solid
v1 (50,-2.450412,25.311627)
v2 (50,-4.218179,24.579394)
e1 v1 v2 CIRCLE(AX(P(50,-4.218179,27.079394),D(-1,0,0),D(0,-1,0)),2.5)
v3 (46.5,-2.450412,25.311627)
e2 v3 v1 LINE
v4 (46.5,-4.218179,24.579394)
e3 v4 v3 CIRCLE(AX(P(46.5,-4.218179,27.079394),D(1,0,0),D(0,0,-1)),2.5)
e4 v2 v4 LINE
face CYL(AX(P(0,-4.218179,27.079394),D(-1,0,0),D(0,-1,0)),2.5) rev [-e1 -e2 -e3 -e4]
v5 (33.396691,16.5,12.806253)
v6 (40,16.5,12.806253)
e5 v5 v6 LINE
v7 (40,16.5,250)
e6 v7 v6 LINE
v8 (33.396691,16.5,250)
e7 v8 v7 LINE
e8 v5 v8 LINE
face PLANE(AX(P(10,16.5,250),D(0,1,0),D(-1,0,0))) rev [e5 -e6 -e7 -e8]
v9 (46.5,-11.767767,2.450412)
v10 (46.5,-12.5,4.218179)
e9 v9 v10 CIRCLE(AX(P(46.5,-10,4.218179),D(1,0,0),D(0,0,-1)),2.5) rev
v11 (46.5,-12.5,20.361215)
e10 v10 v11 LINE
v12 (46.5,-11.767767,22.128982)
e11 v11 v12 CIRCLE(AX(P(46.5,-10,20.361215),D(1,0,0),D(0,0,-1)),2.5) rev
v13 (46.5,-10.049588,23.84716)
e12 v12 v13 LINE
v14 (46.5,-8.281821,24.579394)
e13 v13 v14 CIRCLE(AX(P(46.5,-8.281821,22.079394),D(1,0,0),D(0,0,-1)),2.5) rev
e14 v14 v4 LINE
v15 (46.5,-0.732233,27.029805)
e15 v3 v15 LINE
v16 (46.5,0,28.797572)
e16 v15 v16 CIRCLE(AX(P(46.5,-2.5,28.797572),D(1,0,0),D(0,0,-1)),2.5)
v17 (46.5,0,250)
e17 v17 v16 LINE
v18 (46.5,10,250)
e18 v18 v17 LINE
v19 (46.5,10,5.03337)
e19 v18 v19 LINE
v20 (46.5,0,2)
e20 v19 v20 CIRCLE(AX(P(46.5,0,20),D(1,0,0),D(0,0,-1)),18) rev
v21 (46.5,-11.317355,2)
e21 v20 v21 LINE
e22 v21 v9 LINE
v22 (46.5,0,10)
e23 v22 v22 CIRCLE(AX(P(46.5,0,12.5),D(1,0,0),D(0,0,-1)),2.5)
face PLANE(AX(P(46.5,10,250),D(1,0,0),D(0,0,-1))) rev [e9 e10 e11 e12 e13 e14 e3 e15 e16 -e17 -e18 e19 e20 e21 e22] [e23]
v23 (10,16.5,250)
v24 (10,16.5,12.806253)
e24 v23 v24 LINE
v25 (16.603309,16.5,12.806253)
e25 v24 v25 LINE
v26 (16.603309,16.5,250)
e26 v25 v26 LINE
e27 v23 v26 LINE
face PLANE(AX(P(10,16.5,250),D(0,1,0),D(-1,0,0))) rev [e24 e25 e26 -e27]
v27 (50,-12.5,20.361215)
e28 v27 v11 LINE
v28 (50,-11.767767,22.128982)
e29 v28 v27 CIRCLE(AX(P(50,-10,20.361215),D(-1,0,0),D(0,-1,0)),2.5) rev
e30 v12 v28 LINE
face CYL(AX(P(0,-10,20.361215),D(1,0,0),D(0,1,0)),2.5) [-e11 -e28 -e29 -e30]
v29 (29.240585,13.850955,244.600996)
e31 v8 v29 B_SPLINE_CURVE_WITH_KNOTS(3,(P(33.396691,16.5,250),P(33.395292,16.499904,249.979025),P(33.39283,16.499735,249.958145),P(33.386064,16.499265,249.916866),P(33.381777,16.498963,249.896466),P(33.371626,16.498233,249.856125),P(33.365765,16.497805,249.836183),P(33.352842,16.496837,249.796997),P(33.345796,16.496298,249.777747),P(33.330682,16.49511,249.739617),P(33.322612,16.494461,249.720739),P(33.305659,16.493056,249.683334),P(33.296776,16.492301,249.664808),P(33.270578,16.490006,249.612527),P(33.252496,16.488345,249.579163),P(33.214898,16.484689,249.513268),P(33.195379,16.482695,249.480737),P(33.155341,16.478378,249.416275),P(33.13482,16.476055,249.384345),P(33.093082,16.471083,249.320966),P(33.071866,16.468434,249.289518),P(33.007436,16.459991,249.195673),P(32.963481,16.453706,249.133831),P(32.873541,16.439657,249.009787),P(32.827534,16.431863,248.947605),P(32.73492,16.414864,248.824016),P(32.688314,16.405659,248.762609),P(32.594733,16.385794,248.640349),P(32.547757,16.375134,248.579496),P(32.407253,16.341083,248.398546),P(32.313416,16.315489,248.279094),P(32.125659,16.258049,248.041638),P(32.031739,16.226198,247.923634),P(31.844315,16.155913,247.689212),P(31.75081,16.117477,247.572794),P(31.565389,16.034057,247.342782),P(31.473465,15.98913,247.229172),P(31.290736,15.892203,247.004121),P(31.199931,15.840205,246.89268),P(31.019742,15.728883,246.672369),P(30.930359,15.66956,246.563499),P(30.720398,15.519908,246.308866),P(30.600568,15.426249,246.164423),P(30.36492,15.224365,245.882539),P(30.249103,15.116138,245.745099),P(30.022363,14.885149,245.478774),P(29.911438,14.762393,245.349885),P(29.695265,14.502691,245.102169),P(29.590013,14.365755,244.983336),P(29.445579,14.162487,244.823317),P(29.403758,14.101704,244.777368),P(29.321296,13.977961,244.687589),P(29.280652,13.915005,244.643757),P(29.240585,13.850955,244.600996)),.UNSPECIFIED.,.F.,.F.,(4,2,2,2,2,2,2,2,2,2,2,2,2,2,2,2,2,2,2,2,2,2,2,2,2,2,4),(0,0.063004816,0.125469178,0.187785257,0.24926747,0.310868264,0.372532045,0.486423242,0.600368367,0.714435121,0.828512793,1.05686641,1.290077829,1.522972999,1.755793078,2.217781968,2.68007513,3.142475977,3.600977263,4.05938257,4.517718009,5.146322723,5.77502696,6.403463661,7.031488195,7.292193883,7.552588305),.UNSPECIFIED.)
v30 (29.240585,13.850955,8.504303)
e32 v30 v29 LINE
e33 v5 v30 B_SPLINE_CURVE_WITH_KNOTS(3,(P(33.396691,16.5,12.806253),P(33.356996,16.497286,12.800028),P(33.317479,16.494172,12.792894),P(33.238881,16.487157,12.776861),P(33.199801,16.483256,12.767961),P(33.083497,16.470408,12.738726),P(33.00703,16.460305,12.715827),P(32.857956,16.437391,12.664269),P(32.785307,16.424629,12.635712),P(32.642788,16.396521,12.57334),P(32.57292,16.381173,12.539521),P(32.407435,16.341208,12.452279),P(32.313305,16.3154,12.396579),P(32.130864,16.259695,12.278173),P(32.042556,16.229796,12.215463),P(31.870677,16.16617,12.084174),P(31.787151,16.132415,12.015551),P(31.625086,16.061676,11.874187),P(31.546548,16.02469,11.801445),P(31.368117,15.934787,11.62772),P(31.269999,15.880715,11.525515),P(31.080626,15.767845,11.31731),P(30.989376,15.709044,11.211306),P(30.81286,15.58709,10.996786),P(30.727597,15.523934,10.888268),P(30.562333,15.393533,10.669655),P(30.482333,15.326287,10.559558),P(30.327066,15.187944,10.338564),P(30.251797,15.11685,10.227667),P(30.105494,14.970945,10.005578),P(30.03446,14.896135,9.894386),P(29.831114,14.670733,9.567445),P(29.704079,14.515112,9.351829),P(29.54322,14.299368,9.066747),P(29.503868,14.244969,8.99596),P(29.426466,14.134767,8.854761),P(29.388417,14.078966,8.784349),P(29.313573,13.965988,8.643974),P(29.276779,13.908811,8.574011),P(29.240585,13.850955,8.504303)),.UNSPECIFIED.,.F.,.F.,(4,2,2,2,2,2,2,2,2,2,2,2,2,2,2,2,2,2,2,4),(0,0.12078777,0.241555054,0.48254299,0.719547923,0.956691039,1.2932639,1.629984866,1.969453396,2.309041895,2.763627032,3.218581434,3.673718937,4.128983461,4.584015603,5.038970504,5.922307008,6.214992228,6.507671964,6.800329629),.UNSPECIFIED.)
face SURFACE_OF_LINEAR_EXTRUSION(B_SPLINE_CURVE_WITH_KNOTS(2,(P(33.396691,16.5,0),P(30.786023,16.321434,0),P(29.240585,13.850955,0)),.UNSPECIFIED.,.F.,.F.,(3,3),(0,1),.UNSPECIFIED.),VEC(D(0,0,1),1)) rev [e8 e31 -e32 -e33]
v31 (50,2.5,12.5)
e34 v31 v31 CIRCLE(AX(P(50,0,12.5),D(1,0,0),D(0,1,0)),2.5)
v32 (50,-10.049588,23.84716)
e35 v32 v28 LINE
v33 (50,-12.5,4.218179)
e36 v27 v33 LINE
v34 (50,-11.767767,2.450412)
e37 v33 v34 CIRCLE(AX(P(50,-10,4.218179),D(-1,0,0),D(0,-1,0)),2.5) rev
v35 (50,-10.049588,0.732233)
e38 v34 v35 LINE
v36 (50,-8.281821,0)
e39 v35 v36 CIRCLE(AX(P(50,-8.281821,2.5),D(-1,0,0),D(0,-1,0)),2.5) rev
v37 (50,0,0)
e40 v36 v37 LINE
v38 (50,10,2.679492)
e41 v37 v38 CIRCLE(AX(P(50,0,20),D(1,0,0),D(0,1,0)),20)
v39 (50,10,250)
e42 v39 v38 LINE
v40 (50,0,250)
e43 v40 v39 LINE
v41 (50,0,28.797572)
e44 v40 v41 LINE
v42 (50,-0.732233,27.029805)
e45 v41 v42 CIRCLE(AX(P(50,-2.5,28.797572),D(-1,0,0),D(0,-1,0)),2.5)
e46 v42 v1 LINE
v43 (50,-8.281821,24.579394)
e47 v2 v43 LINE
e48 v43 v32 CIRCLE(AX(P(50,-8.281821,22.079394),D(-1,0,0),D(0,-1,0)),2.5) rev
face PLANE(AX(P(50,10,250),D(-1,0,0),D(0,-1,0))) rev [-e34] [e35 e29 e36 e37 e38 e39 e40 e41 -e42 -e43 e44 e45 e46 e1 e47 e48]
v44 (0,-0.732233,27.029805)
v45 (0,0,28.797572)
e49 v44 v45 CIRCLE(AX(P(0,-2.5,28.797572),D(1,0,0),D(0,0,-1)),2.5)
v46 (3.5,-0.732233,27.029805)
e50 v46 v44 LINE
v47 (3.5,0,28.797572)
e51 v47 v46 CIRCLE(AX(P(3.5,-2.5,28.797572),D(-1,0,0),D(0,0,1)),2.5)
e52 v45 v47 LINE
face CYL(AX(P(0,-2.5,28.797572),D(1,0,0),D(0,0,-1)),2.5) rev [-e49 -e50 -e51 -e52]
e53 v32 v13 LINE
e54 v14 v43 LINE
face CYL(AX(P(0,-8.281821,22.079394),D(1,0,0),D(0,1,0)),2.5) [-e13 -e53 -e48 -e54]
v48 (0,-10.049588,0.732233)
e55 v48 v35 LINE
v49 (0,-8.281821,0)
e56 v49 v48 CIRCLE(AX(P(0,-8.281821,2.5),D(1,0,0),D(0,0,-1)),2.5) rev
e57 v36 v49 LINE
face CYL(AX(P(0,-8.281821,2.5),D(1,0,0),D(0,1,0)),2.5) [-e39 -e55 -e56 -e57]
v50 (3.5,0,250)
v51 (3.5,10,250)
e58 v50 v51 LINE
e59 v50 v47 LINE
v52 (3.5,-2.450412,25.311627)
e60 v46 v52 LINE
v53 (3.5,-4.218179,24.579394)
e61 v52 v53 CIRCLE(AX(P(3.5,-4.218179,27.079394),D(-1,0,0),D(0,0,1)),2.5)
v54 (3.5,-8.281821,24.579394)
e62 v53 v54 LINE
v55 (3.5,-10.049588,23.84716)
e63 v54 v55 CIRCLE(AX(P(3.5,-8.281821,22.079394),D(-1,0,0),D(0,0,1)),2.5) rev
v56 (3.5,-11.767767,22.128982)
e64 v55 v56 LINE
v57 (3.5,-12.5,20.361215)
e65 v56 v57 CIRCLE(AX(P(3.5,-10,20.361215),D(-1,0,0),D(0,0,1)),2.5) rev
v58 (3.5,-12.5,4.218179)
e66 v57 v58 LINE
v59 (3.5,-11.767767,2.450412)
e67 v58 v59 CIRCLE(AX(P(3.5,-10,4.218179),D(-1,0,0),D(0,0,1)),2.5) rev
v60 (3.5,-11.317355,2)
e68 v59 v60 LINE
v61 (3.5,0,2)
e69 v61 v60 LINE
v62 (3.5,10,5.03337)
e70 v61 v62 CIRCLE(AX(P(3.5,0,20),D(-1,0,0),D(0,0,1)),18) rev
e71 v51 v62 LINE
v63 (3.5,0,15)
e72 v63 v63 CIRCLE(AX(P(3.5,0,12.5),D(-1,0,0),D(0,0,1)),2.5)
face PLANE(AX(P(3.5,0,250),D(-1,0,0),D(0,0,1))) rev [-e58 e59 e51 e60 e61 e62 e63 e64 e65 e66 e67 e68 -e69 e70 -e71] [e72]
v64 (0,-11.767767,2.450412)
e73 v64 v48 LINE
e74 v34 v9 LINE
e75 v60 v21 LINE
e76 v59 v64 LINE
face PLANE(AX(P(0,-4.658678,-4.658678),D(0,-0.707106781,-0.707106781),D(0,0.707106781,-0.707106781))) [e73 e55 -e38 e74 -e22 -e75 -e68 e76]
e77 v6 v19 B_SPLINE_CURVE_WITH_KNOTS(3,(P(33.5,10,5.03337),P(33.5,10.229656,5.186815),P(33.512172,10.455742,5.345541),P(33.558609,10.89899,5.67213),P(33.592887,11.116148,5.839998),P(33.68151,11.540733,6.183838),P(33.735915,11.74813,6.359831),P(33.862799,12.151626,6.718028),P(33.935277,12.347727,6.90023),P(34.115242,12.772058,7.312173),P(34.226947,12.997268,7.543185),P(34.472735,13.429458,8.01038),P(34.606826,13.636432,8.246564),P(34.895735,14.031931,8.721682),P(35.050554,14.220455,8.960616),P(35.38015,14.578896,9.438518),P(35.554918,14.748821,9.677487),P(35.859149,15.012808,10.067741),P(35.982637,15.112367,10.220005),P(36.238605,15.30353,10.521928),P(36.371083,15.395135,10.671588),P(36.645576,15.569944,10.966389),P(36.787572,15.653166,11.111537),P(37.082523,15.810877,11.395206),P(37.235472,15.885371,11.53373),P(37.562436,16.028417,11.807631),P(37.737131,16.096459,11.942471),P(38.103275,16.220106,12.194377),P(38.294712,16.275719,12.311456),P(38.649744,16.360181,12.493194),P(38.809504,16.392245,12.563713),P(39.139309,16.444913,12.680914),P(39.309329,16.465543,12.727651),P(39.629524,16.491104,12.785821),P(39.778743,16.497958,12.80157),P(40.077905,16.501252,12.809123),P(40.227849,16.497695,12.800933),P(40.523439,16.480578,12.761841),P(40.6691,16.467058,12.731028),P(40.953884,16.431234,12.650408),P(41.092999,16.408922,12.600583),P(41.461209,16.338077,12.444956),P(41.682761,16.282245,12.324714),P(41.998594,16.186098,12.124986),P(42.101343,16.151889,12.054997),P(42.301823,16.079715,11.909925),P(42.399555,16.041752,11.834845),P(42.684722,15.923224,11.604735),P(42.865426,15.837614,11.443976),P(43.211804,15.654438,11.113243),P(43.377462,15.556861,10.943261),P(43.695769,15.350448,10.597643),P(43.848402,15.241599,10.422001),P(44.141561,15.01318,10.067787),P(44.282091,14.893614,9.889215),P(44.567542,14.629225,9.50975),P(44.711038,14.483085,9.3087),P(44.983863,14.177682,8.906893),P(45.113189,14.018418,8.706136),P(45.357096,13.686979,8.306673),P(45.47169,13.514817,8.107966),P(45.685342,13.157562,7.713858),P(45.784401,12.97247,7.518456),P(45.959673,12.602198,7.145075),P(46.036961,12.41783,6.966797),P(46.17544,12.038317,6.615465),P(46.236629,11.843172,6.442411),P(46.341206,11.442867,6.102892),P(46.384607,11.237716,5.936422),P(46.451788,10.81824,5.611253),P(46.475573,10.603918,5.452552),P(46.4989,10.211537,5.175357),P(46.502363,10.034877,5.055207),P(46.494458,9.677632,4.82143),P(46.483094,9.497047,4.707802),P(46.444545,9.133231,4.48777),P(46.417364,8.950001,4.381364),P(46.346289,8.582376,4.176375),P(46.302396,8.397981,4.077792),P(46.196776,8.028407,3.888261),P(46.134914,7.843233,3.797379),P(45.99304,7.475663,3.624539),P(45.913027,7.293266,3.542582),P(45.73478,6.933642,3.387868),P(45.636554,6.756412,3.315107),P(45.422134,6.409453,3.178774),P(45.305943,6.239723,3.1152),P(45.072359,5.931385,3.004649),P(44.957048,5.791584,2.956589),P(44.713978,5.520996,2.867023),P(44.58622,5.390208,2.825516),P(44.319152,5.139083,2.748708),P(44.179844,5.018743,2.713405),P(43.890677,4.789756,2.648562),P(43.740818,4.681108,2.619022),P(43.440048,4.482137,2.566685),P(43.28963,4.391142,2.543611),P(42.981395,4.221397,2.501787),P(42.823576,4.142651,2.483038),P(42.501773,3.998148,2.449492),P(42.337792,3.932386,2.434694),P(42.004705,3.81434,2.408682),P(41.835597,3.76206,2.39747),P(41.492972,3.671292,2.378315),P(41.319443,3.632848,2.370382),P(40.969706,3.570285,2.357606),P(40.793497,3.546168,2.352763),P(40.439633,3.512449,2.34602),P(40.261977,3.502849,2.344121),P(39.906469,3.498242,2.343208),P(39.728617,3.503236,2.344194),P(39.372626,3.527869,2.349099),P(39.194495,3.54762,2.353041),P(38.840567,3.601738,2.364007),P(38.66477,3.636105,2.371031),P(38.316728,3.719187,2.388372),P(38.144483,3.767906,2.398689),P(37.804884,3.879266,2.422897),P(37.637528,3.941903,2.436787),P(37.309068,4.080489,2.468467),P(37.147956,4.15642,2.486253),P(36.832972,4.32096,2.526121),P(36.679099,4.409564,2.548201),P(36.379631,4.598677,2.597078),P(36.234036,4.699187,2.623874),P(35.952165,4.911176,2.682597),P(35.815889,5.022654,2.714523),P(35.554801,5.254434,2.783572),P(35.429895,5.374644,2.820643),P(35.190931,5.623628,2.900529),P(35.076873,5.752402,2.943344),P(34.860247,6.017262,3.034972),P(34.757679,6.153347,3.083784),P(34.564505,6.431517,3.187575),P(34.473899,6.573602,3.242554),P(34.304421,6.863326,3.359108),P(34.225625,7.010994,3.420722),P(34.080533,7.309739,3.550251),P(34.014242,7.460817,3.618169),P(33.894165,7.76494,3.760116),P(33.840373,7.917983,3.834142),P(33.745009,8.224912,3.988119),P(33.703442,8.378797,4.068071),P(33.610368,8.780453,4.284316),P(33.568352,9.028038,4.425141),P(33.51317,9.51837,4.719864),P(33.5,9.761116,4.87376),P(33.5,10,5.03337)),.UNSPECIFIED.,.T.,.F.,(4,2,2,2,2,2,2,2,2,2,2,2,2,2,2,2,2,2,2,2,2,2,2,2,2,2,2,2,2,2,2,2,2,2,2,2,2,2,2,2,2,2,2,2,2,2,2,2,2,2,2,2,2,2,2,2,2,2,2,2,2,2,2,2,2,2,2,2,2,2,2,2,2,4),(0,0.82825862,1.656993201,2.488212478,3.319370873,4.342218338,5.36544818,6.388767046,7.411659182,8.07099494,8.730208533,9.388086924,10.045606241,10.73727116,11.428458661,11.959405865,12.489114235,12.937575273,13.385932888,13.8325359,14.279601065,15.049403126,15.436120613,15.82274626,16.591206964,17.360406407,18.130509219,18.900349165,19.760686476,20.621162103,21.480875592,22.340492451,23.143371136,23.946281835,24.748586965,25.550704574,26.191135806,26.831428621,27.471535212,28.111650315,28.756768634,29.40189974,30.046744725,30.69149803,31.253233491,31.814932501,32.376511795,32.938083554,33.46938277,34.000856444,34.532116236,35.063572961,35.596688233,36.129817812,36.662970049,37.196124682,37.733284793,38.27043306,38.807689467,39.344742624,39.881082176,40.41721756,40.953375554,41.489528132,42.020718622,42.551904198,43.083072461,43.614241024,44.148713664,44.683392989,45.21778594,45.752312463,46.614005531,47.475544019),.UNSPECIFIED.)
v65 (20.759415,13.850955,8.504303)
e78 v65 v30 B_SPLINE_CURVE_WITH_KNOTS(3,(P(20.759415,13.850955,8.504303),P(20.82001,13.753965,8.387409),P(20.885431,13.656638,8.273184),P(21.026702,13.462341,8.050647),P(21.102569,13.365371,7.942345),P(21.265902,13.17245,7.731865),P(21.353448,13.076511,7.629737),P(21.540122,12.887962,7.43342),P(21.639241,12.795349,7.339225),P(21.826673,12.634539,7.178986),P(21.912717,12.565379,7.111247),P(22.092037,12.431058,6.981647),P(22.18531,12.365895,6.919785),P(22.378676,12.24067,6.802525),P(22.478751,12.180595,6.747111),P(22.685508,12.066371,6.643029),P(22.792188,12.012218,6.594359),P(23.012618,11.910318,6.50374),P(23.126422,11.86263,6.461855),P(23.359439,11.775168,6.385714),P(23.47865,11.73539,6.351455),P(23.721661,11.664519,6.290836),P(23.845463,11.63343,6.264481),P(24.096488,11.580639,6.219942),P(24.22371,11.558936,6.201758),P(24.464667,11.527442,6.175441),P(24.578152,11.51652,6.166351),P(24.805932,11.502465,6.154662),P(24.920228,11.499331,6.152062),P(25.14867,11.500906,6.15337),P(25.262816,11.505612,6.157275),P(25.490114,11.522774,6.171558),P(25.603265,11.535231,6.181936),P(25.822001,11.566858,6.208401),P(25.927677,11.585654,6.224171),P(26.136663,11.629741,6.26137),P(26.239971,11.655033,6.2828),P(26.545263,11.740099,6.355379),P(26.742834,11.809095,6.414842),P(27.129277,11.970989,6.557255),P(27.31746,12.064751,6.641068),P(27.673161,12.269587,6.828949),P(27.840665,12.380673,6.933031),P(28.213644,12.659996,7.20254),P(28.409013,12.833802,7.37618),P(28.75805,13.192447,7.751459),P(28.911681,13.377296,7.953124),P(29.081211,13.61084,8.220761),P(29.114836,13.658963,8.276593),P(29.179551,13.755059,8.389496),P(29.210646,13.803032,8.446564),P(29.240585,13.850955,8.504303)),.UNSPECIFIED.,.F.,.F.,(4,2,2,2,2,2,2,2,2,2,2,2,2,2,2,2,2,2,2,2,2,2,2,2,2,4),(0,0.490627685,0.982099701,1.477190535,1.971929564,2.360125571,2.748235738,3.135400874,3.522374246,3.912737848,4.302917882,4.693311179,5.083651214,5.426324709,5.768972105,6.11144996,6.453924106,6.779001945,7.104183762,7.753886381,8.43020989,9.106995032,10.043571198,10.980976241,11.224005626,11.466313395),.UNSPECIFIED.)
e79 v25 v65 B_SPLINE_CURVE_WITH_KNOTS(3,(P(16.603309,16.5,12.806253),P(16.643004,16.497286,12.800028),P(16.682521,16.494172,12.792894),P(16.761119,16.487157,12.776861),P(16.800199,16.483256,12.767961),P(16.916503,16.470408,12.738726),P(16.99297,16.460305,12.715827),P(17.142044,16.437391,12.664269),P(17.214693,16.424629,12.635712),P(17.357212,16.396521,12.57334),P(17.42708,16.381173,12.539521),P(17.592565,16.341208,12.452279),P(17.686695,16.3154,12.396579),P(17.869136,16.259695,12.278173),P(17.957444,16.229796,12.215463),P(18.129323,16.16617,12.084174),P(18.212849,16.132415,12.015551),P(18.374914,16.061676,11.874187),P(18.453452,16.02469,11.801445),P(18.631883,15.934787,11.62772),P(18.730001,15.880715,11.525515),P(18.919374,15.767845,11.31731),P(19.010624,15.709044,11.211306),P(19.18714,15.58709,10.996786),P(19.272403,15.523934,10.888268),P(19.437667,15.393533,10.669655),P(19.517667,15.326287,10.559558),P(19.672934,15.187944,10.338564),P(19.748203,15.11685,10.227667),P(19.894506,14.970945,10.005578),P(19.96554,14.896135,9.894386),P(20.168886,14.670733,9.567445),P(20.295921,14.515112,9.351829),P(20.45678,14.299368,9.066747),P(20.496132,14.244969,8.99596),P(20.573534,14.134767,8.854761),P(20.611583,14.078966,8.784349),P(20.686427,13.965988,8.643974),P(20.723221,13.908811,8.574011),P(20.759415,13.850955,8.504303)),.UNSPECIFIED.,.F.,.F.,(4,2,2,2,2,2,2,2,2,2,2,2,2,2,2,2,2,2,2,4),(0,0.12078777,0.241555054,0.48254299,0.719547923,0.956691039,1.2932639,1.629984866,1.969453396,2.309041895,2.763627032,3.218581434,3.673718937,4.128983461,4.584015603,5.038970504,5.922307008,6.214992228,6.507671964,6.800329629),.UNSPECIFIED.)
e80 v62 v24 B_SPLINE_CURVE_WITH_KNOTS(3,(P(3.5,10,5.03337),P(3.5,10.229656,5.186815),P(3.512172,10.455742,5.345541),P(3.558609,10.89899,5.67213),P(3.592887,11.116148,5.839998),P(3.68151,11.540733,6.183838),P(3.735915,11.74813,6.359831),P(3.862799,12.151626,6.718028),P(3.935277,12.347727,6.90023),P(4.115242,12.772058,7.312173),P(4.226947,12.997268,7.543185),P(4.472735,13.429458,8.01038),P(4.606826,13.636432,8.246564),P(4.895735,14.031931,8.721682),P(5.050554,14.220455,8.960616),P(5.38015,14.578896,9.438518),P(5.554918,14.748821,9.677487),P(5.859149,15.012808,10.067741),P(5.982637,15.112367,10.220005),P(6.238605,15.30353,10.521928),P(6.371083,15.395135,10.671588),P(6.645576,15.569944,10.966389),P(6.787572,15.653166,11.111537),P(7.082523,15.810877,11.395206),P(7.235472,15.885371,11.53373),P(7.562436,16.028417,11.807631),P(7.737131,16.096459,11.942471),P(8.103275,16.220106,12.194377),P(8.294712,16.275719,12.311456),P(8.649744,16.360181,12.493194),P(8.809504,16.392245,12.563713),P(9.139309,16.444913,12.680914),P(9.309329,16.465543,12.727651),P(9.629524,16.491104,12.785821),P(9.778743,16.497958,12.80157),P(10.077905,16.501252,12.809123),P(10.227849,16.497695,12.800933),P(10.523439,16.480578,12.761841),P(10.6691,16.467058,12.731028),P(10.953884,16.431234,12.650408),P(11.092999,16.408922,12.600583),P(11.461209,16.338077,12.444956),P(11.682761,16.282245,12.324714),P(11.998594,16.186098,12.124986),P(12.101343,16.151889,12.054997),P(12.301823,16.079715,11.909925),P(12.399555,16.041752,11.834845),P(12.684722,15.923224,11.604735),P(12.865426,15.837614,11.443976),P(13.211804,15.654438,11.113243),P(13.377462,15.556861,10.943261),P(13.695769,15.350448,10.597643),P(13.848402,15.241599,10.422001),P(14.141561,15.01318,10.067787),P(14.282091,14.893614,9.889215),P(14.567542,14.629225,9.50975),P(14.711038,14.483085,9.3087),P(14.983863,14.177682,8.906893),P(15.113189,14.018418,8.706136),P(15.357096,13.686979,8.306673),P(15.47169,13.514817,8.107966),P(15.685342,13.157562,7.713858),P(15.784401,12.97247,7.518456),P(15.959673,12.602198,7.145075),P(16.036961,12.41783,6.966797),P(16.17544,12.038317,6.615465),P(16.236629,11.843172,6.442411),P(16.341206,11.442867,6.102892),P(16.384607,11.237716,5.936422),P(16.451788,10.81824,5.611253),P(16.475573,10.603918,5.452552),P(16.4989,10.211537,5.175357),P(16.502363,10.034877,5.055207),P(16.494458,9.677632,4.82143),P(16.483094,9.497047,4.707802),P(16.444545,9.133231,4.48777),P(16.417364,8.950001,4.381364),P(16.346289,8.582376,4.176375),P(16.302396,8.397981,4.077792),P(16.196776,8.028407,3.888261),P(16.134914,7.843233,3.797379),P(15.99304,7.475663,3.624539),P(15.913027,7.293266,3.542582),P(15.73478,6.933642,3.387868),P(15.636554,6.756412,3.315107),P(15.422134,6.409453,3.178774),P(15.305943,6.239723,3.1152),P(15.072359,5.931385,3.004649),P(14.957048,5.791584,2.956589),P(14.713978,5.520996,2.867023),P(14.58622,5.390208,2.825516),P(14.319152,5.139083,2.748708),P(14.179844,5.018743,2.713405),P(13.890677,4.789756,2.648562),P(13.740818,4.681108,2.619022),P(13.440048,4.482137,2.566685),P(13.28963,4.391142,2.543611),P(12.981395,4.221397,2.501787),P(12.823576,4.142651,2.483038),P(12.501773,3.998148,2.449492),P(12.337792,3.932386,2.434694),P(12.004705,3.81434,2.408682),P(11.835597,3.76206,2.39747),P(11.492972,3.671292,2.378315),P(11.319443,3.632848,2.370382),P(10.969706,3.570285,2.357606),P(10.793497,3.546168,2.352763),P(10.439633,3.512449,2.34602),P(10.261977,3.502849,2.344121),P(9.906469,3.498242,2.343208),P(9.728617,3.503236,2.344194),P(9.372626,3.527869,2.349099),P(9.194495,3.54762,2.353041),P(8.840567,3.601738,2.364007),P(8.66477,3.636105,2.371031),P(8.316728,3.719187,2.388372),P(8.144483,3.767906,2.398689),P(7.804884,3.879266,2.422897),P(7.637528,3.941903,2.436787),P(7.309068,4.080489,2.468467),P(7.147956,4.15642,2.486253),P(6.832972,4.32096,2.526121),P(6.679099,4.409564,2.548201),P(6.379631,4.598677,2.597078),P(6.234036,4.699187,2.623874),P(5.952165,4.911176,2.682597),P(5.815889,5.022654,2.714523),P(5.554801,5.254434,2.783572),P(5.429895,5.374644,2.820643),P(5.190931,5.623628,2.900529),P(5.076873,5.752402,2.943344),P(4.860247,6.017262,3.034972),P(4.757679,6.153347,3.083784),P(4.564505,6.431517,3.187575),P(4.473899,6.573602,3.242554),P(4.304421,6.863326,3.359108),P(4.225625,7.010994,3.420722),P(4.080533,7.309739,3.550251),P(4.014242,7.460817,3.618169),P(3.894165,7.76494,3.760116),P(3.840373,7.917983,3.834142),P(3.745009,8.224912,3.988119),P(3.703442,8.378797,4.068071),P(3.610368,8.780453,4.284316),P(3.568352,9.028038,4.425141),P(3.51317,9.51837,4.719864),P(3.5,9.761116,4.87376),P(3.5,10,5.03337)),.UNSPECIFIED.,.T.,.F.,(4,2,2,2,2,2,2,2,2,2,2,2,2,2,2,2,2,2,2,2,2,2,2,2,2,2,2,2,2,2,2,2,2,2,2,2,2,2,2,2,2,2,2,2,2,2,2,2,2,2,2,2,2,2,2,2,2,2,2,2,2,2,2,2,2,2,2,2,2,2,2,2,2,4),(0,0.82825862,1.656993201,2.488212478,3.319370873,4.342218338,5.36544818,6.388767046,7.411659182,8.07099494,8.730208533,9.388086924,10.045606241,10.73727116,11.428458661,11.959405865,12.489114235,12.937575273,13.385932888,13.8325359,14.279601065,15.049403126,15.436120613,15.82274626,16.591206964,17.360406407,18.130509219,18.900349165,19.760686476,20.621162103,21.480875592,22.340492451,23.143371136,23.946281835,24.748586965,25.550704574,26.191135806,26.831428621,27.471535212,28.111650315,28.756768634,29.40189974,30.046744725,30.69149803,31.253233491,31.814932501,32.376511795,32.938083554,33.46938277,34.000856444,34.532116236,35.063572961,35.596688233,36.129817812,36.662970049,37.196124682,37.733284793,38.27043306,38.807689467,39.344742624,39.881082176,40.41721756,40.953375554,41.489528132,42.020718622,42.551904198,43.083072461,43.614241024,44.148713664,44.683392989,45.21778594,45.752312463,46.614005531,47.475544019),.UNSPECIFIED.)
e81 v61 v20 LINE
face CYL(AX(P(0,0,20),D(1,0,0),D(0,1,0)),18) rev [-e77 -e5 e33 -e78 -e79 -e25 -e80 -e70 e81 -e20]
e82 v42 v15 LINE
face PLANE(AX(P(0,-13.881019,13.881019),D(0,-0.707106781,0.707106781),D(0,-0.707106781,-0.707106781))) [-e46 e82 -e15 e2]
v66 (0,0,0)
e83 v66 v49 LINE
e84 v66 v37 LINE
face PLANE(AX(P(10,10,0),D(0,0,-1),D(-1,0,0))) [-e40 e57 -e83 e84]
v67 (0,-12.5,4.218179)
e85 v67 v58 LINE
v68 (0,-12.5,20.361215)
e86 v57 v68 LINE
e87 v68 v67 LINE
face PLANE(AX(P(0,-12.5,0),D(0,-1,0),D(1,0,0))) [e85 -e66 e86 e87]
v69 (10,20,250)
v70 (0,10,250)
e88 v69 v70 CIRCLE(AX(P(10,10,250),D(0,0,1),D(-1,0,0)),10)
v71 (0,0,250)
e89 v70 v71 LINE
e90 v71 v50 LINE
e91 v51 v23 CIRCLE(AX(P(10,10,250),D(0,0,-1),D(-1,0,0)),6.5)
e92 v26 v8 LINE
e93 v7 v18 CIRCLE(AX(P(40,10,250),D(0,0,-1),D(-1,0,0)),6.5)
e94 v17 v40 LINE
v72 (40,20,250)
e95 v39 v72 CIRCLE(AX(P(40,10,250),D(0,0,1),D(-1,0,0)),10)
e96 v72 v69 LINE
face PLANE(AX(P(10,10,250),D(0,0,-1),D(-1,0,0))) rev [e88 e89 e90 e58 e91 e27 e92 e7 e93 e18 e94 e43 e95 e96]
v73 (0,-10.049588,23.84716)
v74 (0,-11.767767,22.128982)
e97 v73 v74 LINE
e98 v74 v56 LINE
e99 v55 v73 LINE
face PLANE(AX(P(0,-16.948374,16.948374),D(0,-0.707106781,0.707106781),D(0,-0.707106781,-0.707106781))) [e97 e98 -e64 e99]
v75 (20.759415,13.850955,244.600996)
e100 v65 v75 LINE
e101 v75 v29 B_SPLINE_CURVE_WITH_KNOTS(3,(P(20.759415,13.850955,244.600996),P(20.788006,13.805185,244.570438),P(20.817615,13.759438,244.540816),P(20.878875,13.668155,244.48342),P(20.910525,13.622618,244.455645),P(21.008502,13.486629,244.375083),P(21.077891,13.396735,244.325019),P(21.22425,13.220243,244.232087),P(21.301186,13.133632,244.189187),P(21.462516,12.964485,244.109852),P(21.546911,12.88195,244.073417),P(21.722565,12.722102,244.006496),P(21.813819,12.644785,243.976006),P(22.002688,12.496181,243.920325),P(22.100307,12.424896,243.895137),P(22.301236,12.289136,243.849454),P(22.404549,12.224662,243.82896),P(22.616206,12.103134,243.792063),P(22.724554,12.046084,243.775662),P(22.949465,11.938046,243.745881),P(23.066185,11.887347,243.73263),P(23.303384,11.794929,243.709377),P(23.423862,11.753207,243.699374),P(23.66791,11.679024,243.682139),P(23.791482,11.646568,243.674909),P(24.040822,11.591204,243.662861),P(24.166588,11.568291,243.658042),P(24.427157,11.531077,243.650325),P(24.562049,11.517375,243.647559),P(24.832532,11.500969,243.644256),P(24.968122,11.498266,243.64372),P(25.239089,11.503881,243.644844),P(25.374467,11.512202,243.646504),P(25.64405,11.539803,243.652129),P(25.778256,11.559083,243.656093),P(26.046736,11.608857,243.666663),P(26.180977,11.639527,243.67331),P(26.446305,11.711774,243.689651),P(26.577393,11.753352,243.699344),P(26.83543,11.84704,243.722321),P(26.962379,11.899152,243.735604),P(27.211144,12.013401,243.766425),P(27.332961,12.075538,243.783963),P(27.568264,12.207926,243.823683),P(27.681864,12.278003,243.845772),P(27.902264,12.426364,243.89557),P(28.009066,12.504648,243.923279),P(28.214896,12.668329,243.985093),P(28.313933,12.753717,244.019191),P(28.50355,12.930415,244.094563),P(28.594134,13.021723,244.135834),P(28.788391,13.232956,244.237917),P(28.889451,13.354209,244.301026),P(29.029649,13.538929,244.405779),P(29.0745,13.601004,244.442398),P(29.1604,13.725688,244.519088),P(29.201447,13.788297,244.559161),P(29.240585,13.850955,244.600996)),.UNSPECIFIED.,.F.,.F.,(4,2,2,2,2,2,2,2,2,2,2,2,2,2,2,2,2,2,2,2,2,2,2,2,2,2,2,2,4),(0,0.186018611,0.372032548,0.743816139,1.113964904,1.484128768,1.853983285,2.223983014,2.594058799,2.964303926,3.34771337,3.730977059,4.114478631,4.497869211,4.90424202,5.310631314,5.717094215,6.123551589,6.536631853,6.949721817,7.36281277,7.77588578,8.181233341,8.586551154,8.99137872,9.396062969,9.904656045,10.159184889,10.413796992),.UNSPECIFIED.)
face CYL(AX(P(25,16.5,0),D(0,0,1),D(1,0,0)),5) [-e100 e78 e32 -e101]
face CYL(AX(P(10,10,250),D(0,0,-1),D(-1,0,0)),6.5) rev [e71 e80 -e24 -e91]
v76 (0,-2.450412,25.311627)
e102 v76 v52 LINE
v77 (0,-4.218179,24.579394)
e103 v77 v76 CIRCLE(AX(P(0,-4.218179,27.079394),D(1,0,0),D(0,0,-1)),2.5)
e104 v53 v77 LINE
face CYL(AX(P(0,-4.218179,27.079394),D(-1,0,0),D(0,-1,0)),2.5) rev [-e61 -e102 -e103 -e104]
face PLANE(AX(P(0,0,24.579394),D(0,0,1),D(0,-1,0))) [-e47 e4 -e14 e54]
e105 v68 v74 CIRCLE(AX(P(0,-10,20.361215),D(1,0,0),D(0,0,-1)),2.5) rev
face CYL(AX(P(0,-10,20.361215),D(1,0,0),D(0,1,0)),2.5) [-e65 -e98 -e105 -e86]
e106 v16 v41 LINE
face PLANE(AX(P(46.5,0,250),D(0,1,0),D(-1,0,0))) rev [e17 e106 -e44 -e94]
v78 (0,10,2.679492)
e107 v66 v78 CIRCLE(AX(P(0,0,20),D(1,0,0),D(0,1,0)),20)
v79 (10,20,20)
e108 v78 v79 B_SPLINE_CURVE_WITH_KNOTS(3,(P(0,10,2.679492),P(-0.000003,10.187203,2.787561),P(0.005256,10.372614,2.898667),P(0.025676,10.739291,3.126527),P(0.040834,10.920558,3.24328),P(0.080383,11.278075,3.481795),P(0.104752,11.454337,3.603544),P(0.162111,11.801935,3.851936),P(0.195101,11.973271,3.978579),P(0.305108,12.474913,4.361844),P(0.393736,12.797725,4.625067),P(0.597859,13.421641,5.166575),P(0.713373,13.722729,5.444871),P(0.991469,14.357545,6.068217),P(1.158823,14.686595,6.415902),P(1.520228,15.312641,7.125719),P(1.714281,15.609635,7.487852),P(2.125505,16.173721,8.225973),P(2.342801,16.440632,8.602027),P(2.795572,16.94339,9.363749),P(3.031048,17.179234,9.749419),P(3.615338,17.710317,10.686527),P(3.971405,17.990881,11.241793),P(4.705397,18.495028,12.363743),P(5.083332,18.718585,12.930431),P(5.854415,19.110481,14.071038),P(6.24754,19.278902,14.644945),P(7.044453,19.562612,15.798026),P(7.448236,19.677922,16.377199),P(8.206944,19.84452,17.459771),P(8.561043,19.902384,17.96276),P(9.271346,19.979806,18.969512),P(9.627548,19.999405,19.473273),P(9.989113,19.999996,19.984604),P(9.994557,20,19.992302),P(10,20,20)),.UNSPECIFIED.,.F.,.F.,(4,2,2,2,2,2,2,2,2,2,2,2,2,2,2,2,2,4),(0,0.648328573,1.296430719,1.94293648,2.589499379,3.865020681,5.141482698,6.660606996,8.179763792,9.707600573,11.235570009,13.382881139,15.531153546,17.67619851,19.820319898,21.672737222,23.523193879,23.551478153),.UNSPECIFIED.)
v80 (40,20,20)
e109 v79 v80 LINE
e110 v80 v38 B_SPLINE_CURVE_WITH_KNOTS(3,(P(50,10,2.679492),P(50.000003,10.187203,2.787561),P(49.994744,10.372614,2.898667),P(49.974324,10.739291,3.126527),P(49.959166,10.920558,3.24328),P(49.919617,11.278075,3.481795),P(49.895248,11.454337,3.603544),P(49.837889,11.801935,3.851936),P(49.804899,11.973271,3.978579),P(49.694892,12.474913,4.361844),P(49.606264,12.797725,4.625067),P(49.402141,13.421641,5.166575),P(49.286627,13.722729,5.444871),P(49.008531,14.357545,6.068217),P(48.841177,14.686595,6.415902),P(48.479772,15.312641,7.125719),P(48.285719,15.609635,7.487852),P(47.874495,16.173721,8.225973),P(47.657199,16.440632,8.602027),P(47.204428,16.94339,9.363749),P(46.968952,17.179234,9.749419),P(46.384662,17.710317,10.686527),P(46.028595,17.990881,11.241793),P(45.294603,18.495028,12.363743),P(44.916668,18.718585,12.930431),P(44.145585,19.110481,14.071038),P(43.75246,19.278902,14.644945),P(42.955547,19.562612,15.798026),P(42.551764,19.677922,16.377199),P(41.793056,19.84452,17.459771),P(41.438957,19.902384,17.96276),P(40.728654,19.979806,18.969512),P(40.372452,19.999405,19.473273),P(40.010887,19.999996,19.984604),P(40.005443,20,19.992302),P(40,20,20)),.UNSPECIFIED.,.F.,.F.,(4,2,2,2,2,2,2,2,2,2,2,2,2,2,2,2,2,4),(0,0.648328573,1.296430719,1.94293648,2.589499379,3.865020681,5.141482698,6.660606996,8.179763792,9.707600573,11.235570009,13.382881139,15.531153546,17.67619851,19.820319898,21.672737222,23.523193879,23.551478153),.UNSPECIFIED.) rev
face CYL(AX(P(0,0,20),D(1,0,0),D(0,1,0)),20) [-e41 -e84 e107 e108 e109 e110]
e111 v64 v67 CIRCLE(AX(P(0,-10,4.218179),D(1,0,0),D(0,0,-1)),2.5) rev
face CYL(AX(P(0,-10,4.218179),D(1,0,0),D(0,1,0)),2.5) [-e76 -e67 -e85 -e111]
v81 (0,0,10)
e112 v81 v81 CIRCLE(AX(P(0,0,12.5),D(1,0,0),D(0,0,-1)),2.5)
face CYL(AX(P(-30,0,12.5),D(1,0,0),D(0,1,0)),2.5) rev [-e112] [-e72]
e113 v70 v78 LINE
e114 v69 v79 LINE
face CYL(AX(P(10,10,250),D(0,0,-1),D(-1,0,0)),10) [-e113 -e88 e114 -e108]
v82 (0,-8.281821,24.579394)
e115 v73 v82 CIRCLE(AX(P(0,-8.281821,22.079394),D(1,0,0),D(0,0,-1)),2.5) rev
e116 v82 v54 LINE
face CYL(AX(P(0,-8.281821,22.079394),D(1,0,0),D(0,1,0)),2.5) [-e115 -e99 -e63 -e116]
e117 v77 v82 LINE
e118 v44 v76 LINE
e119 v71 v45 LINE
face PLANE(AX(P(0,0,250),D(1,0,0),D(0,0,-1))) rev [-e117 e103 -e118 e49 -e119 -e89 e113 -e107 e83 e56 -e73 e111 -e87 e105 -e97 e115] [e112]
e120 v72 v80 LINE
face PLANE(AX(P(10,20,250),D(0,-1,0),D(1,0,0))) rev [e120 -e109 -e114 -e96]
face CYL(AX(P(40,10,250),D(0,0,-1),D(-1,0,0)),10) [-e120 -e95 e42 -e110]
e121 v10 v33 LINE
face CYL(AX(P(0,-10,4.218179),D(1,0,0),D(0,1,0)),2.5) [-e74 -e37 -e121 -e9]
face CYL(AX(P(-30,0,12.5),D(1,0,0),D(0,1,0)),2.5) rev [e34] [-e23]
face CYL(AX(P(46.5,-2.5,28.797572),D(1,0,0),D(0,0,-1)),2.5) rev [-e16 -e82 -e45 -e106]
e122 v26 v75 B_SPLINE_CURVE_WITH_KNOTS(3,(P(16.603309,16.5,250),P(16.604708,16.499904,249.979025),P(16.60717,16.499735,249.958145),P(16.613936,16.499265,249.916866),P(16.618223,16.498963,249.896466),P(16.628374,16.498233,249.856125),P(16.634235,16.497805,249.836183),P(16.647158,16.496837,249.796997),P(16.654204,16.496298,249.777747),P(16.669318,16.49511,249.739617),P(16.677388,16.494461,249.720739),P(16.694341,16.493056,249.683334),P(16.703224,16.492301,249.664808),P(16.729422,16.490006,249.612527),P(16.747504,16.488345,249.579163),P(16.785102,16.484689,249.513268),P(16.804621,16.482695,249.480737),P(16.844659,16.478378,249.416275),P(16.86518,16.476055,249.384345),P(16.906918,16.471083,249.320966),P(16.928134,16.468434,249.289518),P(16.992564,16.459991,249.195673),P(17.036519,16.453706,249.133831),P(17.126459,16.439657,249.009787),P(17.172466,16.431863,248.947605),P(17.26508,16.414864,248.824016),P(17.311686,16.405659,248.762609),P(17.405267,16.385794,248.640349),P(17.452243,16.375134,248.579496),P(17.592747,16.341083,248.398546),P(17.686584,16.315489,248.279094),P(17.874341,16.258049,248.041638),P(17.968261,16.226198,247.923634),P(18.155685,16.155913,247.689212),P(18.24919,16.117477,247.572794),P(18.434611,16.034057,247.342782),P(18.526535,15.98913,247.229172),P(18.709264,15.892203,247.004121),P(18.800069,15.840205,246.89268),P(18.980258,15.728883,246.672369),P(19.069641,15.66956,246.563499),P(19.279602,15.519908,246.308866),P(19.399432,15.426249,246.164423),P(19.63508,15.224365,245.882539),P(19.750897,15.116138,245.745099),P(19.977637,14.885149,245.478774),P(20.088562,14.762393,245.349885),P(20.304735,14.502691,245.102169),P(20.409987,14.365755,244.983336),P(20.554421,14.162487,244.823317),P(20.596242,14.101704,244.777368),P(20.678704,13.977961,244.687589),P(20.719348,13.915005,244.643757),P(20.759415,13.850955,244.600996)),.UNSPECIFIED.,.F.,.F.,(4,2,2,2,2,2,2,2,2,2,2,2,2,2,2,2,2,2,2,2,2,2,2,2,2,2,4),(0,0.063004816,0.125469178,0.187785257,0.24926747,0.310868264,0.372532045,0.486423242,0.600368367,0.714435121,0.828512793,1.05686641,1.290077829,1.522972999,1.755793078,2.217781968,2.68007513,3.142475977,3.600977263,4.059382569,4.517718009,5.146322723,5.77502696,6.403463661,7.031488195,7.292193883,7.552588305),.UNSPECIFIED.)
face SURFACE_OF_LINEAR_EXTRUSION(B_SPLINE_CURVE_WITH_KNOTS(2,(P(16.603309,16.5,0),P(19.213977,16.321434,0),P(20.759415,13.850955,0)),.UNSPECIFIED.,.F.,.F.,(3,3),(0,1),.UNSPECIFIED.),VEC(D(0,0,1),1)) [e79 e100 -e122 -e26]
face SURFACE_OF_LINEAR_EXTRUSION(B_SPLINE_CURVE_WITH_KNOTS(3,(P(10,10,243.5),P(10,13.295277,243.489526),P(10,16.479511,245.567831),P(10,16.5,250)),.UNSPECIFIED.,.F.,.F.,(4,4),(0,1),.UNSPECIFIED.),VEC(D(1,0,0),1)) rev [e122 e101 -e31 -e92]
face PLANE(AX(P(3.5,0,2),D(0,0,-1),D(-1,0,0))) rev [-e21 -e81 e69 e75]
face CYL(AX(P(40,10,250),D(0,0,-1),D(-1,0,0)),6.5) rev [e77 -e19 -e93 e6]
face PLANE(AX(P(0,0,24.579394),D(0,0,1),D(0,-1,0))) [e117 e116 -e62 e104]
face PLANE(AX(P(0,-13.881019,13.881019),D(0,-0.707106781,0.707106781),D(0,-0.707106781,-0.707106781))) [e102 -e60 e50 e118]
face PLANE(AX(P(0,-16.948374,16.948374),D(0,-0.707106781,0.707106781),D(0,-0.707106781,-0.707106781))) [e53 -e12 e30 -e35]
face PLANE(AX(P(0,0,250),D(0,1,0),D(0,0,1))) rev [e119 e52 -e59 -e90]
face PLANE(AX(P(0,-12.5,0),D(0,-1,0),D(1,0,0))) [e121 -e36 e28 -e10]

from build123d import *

# Parameters (mm, degrees)
BOSS_EXTRUDE1_DEPTH = 250
BOSS_EXTRUDE3_START = -50
BOSS_EXTRUDE3_DEPTH = 50
CUT_EXTRUDE1_DEPTH  = 50
BOSS_EXTRUDE4_DEPTH = 50
CUT_EXTRUDE2_DEPTH  = 256.734237176
SKETCH8_W           = 43
SKETCH8_H           = 25.762038467
CUT_EXTRUDE3_DEPTH  = 12.5
CUT_EXTRUDE4_START  = -80
CUT_EXTRUDE4_DEPTH  = 80
FILLET1_R           = 2.5
BOSS_EXTRUDE5_DEPTH = 250
CUT_EXTRUDE5_START  = -33.39669099
CUT_EXTRUDE5_DEPTH  = 16.79338188
CUT_EXTRUDE6_START  = -33.39669099
CUT_EXTRUDE6_DEPTH  = 16.79338198


# Read off the part's stored shape, not the designer's step: Boss-Extrude3, Cut-Extrude5, Cut-Extrude6
with BuildPart() as part:
    # Sketch2 → Boss-Extrude1 (new body)
    with BuildSketch(Plane.XY):
        with BuildLine():
            Line((0, 0), (0, 10))
            ThreePointArc((0, 10), (2.928932188, 17.071067812), (10, 20))
            Line((10, 20), (40, 20))
            ThreePointArc((40, 20), (47.071067812, 17.071067812), (50, 10))
            Line((50, 10), (50, 0))
            Line((50, 0), (46.5, 0))
            Line((46.5, 0), (46.5, 10))
            ThreePointArc((46.5, 10), (44.596194078, 14.596194078), (40, 16.5))
            Line((40, 16.5), (10, 16.5))
            ThreePointArc((10, 16.5), (5.403805922, 14.596194078), (3.5, 10))
            Line((3.5, 10), (3.5, 0))
            Line((3.5, 0), (0, 0))
        make_face()
    extrude(amount=BOSS_EXTRUDE1_DEPTH)

    # Boss-Extrude3 outline → Boss-Extrude3 (add)
    with BuildSketch(Plane(origin=(50, 0, 0), x_dir=(0, 0, -1), z_dir=(1, 0, 0)).offset(BOSS_EXTRUDE3_START)):
        with BuildLine():
            Line((-3.182644966, -12.5), (0, -9.317355034))
            Line((0, -9.317355034), (0, 0))
            Line((0, 0), (-10, 0))
            ThreePointArc((-10, 0), (-12.5, 2.5), (-15, 0))
            Line((-15, 0), (-27.762038467, 0))
            Line((-27.762038467, 0), (-24.579393501, -3.182644966))
            Line((-24.579393501, -3.182644966), (-24.579393501, -9.317355034))
            Line((-24.579393501, -9.317355034), (-21.396748534, -12.5))
            Line((-21.396748534, -12.5), (-3.182644966, -12.5))
        make_face()
    extrude(amount=BOSS_EXTRUDE3_DEPTH)

    # Sketch5 → Cut-Extrude1 (cut)
    with BuildSketch(Plane(origin=(50, 0, 0), x_dir=(0, 0, -1), z_dir=(1, 0, 0))):
        with BuildLine():
            Line((-2.679491924, 10), (0, 10))
            Line((0, 10), (0, 20))
            Line((0, 20), (-20, 20))
            ThreePointArc((-20, 20), (-10, 17.320508076), (-2.679491924, 10))
        make_face()
        with BuildLine():
            ThreePointArc((-2.679491924, 10), (-0.681483474, 5.176380902), (0, 0))
            Line((0, 0), (0, 10))
            Line((0, 10), (-2.679491924, 10))
        make_face()
    extrude(amount=-CUT_EXTRUDE1_DEPTH, mode=Mode.SUBTRACT)

    # Sketch6 → Boss-Extrude4 (add)
    with BuildSketch(Plane(origin=(50, 0, 0), x_dir=(0, 0, -1), z_dir=(1, 0, 0))):
        with BuildLine():
            Line((0, 0), (-2, 0))
            ThreePointArc((-2, 0), (-7.272077939, 12.727922061), (-20, 18))
            Line((-20, 18), (-20, 20))
            ThreePointArc((-20, 20), (-5.857864376, 14.142135624), (0, 0))
        make_face()
    extrude(amount=-BOSS_EXTRUDE4_DEPTH)

    # Sketch7 → Cut-Extrude2 (cut, through all)
    with BuildSketch(Plane.XY.offset(250)):
        with BuildLine():
            Line((55.315480724, 1.557102667), (50, 0))
            Line((50, 0), (50, 10))
            ThreePointArc((50, 10), (47.071067812, 17.071067812), (40, 20))
            Line((40, 20), (10, 20))
            ThreePointArc((10, 20), (2.928932188, 17.071067812), (0, 10))
            Line((0, 10), (0, 0))
            Line((0, 0), (-9.288267342, 0))
            Line((-9.288267342, 0), (-7.589565667, 19.446554679))
            Line((-7.589565667, 19.446554679), (-2.440376216, 23.109380165))
            Line((-2.440376216, 23.109380165), (52.555090503, 23.109380165))
            Line((52.555090503, 23.109380165), (55.315480724, 10.793793023))
            Line((55.315480724, 10.793793023), (55.315480724, 1.557102667))
        make_face()
    extrude(amount=-CUT_EXTRUDE2_DEPTH, mode=Mode.SUBTRACT)

    # Sketch8 → Cut-Extrude3 (cut)
    with BuildSketch(Plane.XZ.offset(12.5)):
        with Locations((25, 14.881019233)):
            Rectangle(SKETCH8_W, SKETCH8_H)
    extrude(amount=-CUT_EXTRUDE3_DEPTH, mode=Mode.SUBTRACT)

    # Sketch9 → Cut-Extrude4 (cut)
    with BuildSketch(Plane(origin=(50, 0, 0), x_dir=(0, 0, -1), z_dir=(1, 0, 0)).offset(CUT_EXTRUDE4_START)):
        with BuildLine():
            ThreePointArc((-10, 0), (-12.5, 2.5), (-15, 0))
            Line((-15, 0), (-14.893392212, 0))
            Line((-14.893392212, 0), (-12.5, 0))
            Line((-12.5, 0), (-10, 0))
        make_face()
        with BuildLine():
            ThreePointArc((-10, 0), (-12.5, 2.5), (-15, 0))
            Line((-15, 0), (-14.893392212, 0))
            Line((-14.893392212, 0), (-12.5, 0))
            Line((-12.5, 0), (-10, 0))
        make_face()
        with BuildLine():
            Line((-14.893392212, 0), (-15, 0))
            ThreePointArc((-15, 0), (-12.5, -2.5), (-10, 0))
            Line((-10, 0), (-12.5, 0))
            Line((-12.5, 0), (-14.893392212, 0))
        make_face()
    extrude(amount=CUT_EXTRUDE4_DEPTH, mode=Mode.SUBTRACT)

    # Fillet1
    fillet1_edges = [part.edges().sort_by_distance(p)[0] for p in [
        (48.25, -3.182644966, 24.579393501),
        (48.25, -9.317355034, 24.579393501),
        (48.25, -12.5, 21.396748534),
        (48.25, -12.5, 3.182644966),
        (1.75, 0, 27.762038467),
        (1.75, -3.182644966, 24.579393501),
        (48.25, 0, 27.762038467),
        (25, -9.317355034, 0),
        (1.75, -12.5, 3.182644966),
        (1.75, -12.5, 21.396748534),
        (1.75, -9.317355034, 24.579393501),
    ]]
    fillet(fillet1_edges, radius=FILLET1_R)

    # Sketch11 → Boss-Extrude5 (add)
    with BuildSketch(Plane.XY.offset(250)):
        with BuildLine():
            Line((33.39669089, 16.5), (25, 16.5))
            Line((25, 16.5), (25, 11.5))
            ThreePointArc((25, 11.5), (27.424332471, 12.127059105), (29.240585043, 13.850955173))
            add(Edge.make_bspline(
                [(33.39669089, 16.5), (30.786023125, 16.321433546), (29.240585043, 13.850955173)],
                knots=[0, 0, 0, 1, 1, 1], degree=2))
        make_face()
        with BuildLine():
            Line((25, 11.5), (25, 16.5))
            Line((25, 16.5), (16.60330911, 16.5))
            add(Edge.make_bspline(
                [(16.60330911, 16.5), (19.213976875, 16.321433546), (20.759414957, 13.850955173)],
                knots=[0, 0, 0, 1, 1, 1], degree=2))
            ThreePointArc((20.759414957, 13.850955173), (22.575667529, 12.127059105), (25, 11.5))
        make_face()
    extrude(amount=-BOSS_EXTRUDE5_DEPTH)

    # Cut-Extrude5 outline → Cut-Extrude5 (cut)
    with BuildSketch(Plane(origin=(50, 0, 0), x_dir=(0, 0, -1), z_dir=(1, 0, 0)).offset(CUT_EXTRUDE5_START)):
        with BuildLine():
            Line((3.259725814, 21.536498362), (-20, 20))
            ThreePointArc((-20, 20), (-14.083920217, 19.104973175), (-8.697345445, 16.5))
            ThreePointArc((-8.697345445, 16.5), (-5.32403803, 13.587352216), (-2.679491924, 10))
            Line((-2.679491924, 10), (3.666220077, 8.833552657))
            Line((3.666220077, 8.833552657), (4.936514647, 14.11797807))
            Line((4.936514647, 14.11797807), (3.259725814, 21.536498362))
        make_face()
    extrude(amount=CUT_EXTRUDE5_DEPTH, mode=Mode.SUBTRACT)

    # Cut-Extrude6 outline → Cut-Extrude6 (cut)
    with BuildSketch(Plane(origin=(50, 0, 0), x_dir=(0, 0, -1), z_dir=(1, 0, 0)).offset(CUT_EXTRUDE6_START)):
        with BuildLine():
            Line((-250, 10), (-243.5, 10))
            add(Edge.make_bspline(
                [(-243.5, 10), (-243.489525842, 13.29527732), (-245.567830826, 16.47951056), (-250, 16.5)],
                knots=[0, 0, 0, 0, 1, 1, 1, 1], degree=3))
            Line((-250, 16.5), (-250, 10))
        make_face()
    extrude(amount=CUT_EXTRUDE6_DEPTH, mode=Mode.SUBTRACT)


solid = part.part
